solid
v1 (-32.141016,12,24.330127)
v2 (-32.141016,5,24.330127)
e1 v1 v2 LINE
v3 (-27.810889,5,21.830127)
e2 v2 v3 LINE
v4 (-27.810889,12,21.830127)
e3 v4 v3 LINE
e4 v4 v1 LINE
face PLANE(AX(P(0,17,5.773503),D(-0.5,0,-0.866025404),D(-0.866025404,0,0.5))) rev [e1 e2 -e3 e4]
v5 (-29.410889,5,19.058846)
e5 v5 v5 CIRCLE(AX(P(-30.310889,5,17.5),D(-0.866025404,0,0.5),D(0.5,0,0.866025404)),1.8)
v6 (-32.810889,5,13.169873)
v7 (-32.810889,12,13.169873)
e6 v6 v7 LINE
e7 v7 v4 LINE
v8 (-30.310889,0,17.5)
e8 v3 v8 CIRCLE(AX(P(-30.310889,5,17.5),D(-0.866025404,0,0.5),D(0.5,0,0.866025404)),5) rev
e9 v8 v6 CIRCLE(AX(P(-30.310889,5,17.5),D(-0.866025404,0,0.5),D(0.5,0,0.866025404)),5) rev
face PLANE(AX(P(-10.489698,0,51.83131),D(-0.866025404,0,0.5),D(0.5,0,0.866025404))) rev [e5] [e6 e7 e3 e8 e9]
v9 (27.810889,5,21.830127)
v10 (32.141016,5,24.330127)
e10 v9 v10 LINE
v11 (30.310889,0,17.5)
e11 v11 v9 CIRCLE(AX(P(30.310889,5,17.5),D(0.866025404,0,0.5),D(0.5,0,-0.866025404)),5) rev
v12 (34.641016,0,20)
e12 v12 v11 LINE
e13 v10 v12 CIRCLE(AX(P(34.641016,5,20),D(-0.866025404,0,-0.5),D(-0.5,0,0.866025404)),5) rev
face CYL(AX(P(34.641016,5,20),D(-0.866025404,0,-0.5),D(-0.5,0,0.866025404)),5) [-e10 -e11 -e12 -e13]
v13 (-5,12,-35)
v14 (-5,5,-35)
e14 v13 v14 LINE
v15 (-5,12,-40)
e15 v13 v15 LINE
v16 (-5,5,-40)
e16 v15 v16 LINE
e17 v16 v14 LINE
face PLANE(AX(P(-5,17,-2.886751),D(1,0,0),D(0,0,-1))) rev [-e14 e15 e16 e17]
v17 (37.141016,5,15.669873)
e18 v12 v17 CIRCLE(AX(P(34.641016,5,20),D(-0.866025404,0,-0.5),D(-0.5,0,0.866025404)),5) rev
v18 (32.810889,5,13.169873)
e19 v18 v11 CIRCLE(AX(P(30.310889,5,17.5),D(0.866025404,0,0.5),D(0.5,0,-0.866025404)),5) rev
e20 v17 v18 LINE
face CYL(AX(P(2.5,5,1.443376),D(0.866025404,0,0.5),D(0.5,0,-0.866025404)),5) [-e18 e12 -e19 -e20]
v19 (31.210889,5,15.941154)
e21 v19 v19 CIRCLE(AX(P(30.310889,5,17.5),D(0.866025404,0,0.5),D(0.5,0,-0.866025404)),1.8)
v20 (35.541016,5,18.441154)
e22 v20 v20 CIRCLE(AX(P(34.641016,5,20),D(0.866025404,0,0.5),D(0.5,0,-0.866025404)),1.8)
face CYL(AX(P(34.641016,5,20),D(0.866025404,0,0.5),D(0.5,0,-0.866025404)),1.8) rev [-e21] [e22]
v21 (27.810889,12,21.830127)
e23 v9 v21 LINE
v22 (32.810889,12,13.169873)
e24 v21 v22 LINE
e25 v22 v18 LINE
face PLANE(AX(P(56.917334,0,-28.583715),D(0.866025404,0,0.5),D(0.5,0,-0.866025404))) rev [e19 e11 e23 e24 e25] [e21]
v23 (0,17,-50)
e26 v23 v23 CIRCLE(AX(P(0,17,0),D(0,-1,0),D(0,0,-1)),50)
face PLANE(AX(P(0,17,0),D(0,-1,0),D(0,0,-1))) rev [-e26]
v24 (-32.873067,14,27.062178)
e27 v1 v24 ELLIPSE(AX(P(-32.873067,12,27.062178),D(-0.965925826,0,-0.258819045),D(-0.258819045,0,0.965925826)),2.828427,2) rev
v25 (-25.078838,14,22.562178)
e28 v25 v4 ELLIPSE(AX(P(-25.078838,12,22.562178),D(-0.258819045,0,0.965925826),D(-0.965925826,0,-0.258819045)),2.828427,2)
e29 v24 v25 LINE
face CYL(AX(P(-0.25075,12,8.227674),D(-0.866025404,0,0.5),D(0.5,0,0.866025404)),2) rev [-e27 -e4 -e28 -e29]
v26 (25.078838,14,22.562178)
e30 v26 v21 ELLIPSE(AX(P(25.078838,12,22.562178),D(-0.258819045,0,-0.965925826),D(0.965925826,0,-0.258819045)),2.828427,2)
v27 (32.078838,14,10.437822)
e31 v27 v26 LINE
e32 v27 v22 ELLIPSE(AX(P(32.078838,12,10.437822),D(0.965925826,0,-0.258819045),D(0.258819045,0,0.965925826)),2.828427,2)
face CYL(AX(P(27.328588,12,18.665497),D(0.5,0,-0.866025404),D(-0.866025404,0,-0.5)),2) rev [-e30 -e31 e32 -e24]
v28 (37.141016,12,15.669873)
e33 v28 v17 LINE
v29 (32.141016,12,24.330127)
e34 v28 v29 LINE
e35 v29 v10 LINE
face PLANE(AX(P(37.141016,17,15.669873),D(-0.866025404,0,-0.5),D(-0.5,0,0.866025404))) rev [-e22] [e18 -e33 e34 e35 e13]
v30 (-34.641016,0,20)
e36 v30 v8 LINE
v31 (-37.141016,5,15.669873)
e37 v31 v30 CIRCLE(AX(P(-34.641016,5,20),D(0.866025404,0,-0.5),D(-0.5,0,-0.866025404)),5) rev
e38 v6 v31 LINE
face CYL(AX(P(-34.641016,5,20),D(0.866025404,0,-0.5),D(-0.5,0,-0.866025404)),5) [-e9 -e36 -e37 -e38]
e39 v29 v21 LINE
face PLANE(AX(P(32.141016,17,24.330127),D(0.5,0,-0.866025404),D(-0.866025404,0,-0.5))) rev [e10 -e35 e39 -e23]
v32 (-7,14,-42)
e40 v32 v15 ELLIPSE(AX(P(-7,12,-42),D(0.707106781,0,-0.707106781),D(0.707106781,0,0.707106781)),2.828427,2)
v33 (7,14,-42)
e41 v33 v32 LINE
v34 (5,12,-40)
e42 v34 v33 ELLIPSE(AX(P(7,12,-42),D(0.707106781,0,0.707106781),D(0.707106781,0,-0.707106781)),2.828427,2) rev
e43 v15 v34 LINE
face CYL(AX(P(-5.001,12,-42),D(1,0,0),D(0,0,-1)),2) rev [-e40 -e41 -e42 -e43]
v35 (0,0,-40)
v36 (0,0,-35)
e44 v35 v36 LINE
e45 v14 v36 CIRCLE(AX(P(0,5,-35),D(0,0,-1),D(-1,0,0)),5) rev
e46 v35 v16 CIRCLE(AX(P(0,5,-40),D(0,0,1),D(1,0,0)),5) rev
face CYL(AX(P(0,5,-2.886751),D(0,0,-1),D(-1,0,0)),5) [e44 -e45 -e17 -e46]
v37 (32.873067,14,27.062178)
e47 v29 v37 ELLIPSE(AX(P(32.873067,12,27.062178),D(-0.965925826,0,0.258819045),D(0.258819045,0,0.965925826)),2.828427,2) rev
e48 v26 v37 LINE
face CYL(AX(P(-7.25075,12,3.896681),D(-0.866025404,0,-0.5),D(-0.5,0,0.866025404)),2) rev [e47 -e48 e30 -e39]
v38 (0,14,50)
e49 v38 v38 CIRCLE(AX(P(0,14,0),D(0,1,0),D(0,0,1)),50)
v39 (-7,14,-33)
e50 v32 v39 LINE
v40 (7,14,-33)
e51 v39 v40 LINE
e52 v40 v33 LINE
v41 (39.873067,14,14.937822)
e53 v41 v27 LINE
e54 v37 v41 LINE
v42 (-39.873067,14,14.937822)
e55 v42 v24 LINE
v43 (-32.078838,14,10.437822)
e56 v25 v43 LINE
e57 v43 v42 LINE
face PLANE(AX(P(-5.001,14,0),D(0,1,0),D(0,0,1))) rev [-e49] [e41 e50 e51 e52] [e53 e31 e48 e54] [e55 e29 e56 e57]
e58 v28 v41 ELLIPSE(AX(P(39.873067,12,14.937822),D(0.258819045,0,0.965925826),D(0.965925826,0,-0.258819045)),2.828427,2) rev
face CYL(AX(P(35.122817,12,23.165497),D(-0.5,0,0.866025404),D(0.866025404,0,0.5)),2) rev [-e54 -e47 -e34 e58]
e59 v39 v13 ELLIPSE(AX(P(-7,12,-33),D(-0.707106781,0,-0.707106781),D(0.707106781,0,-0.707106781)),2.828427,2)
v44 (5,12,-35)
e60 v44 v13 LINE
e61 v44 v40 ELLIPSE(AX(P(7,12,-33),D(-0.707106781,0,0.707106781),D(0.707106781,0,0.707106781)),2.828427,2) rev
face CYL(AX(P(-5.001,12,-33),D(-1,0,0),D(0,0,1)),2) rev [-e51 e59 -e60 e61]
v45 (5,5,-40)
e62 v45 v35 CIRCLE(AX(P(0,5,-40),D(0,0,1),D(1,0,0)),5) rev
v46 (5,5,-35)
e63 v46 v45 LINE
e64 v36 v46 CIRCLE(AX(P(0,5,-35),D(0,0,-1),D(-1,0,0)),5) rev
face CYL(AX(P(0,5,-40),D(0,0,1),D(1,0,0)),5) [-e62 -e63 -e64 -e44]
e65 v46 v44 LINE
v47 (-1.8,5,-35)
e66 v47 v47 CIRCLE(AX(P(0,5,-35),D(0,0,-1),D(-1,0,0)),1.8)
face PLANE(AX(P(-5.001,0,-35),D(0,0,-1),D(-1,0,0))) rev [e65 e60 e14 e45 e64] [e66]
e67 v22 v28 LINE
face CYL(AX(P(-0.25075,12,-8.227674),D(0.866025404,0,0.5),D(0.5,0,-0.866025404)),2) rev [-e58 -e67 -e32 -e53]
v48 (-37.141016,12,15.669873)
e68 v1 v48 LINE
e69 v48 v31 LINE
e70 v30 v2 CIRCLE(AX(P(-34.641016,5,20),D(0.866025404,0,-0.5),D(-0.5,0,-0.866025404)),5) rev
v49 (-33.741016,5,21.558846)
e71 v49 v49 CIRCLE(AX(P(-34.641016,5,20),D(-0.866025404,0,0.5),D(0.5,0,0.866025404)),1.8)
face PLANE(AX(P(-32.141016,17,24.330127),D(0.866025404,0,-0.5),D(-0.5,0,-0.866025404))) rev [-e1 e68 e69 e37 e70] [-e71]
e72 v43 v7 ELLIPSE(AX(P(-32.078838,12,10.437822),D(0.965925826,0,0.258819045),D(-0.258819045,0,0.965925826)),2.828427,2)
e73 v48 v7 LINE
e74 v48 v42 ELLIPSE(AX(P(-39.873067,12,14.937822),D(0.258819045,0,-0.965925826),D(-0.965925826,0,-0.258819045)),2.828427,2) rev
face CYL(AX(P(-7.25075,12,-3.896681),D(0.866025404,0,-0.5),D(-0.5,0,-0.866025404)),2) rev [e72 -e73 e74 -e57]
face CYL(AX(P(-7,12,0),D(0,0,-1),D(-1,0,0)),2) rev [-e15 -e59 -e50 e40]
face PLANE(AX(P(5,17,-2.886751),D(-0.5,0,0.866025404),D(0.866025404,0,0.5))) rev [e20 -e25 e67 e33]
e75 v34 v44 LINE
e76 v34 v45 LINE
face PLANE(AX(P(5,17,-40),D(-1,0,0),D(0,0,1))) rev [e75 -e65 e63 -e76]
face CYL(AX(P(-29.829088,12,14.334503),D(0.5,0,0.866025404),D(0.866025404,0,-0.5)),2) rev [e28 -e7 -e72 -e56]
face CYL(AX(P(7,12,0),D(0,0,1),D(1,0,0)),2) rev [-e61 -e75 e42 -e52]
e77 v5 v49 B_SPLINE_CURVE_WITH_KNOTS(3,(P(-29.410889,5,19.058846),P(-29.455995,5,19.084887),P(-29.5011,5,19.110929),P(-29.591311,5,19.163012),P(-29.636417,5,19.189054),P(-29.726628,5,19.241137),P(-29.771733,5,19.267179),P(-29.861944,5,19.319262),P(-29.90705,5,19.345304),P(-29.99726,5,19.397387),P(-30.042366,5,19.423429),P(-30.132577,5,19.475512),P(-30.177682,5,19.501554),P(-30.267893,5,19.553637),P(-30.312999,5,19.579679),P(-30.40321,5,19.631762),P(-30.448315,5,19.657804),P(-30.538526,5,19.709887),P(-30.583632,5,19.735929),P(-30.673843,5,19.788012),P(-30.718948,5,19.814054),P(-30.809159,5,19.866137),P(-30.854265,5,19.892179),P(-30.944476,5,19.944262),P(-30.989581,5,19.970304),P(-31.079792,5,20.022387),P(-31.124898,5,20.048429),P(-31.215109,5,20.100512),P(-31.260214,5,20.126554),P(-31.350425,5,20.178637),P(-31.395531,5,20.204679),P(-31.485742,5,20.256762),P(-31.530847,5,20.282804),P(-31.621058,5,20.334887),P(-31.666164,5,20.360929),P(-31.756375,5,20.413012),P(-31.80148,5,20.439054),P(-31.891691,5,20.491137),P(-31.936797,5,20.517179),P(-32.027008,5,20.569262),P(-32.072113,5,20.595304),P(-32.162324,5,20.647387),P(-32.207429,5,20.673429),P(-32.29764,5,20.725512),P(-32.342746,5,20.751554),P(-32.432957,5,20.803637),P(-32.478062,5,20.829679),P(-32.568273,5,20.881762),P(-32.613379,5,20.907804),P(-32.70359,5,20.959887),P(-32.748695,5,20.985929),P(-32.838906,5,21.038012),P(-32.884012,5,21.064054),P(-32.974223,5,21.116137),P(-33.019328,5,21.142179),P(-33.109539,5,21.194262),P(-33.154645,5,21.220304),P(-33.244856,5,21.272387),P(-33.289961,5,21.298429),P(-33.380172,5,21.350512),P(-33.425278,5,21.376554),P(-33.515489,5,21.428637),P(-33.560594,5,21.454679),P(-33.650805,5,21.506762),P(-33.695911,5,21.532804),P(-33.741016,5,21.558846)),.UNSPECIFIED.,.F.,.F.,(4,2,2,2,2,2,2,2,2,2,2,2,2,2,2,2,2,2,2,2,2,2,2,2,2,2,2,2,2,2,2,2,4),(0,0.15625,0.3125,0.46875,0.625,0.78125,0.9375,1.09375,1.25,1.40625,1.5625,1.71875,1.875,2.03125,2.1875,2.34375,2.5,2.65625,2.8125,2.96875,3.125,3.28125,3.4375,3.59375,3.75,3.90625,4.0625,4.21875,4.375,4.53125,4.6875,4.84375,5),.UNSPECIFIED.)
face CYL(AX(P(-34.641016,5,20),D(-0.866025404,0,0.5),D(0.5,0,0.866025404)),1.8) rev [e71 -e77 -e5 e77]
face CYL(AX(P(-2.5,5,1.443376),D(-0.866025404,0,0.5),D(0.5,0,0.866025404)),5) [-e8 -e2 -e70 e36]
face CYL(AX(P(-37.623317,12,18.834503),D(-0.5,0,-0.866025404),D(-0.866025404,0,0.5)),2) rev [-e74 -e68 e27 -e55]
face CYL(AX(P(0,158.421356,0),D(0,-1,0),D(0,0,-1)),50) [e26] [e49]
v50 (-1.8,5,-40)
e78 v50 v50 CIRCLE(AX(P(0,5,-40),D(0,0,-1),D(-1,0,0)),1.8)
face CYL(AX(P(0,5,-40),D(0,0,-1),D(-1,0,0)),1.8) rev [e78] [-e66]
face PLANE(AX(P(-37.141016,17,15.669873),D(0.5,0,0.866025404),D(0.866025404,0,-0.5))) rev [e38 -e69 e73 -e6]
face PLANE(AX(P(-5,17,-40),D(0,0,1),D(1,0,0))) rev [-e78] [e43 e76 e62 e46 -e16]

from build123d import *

# Parameters (mm, degrees)
BOSS_EXTRUDE1_DEPTH     = 17
CUT_EXTRUDE1_REACH      = 46.598
SKETCH3_W               = 35
SKETCH3_H               = 14
FILLET1_R               = 5
M3_CLEARANCE_HOLE1_D    = 3.6
CIRPATTERN1_START       = 14
CIRPATTERN1_DEPTH       = 3
CIRPATTERN1_START_2     = 6.8000001
CIRPATTERN1_2_DEPTH     = 7.1999999
CIRPATTERN1_3_DEPTH     = 6.8000001
CIRPATTERN1_START_3     = -40
CIRPATTERN1_4_OUTLINE_R = 1.8
CIRPATTERN1_4_DEPTH     = 5
CIRPATTERN1_START_4     = 35
CIRPATTERN1_5_OUTLINE_R = 1.8
CIRPATTERN1_5_DEPTH     = 5
SKETCH6_R               = 50
BOSS_EXTRUDE2_DEPTH     = 3
FILLET6_R               = 2


with BuildPart() as part:
    # Sketch2 → Boss-Extrude1 (new body)
    with BuildSketch(Plane(origin=(0, 0, 0), x_dir=(1, 0, 0), z_dir=(0, 1, 0))):
        Polygon((0, 0), (-5, 2.886751346), (-5, 40), (5, 40), (5, 2.886751346), align=None)
    extrude(amount=BOSS_EXTRUDE1_DEPTH)

    # Sketch3 → Cut-Extrude1 (cut, up to next)
    with BuildSketch(Plane(origin=(5, 0, 0), x_dir=(0, 0, -1), z_dir=(1, 0, 0)), mode=Mode.PRIVATE) as cut_extrude1_sk1:
        with Locations((17.5, 7)):
            Rectangle(SKETCH3_W, SKETCH3_H)
    cut_extrude1_tool1 = extrude(cut_extrude1_sk1.sketch, amount=-CUT_EXTRUDE1_REACH, mode=Mode.PRIVATE) & part.part
    add(cut_extrude1_tool1.solids().sort_by_distance((5, 7, -17.5))[0], mode=Mode.SUBTRACT)

    # Fillet1
    fillet1_edges = [part.edges().sort_by_distance(p)[0] for p in [
        (-5, 0, -37.5),
        (5, 0, -37.5),
    ]]
    fillet(fillet1_edges, radius=FILLET1_R - 0.0001)  # a hair under: the kernel refuses the full size

    # M3 Clearance Hole1 (through all)
    with Locations(Plane(origin=(0, 0, -40), x_dir=(-1, 0, 0), z_dir=(0, 0, -1))):
        with Locations((0, 5)):
            Hole(M3_CLEARANCE_HOLE1_D / 2)

    # CirPattern1: read off the stored shape, not the designer's step
    # CirPattern1 outline → CirPattern1 (add)
    with BuildSketch(Plane(origin=(0, 0, 0), x_dir=(1, 0, 0), z_dir=(0, 1, 0)).offset(CIRPATTERN1_START)):
        Polygon((-37.141016151, -15.669872981), (-32.141016151, -24.330127019), (0, -5.773502692), (32.141016151, -24.330127019), (37.141016151, -15.669872981), (5, 2.886751346), (0, 0), (-5, 2.886751346), align=None)
    extrude(amount=CIRPATTERN1_DEPTH)

    # CirPattern1 2 outline → CirPattern1 2 (add)
    with BuildSketch(Plane(origin=(0, 0, 0), x_dir=(1, 0, 0), z_dir=(0, 1, 0)).offset(CIRPATTERN1_START_2)):
        Polygon((-32.810889132, -13.169872981), (-37.141016151, -15.669872981), (-32.141016151, -24.330127019), (-27.810889132, -21.830127019), align=None)
        Polygon((32.810889132, -13.169872981), (27.810889132, -21.830127019), (32.141016151, -24.330127019), (37.141016151, -15.669872981), align=None)
    extrude(amount=CIRPATTERN1_2_DEPTH)

    # CirPattern1 3 outline → CirPattern1 3 (add)
    with BuildSketch(Plane(origin=(0, 0, 0), x_dir=(1, 0, 0), z_dir=(0, 1, 0))):
        Polygon((32.810889132, -13.169872981), (27.810889132, -21.830127019), (32.141016151, -24.330127019), (37.141016151, -15.669872981), align=None)
        Polygon((-32.810889132, -13.169872981), (-37.141016151, -15.669872981), (-32.141016151, -24.330127019), (-27.810889132, -21.830127019), align=None)
    extrude(amount=CIRPATTERN1_3_DEPTH)

    # CirPattern1 4 outline → CirPattern1 4 (cut)
    with BuildSketch(Plane(origin=(0, 0, 0), x_dir=(0.500000000000006, 0, 0.8660254037844353), z_dir=(0.8660254037844352, 0, -0.5000000000000061)).offset(CIRPATTERN1_START_3)):
        with BuildLine():
            Line((5, 0), (0, 0))
            ThreePointArc((0, 0), (3.535533906, -1.464466094), (5, -5))
            Line((5, -5), (5, 0))
        make_face()
        with BuildLine():
            ThreePointArc((-5, -5), (-3.535533906, -1.464466094), (0, 0))
            Line((0, 0), (-5, 0))
            Line((-5, 0), (-5, -5))
        make_face()
        with Locations((0, -5)):
            Circle(CIRPATTERN1_4_OUTLINE_R)
    extrude(amount=CIRPATTERN1_4_DEPTH, mode=Mode.SUBTRACT)

    # CirPattern1 5 outline → CirPattern1 5 (cut)
    with BuildSketch(Plane(origin=(0, 0, 0), x_dir=(0.4999999999999894, 0, -0.8660254037844448), z_dir=(0.8660254037844447, 0, 0.4999999999999898)).offset(CIRPATTERN1_START_4)):
        with BuildLine():
            Line((-5, 0), (0, 0))
            ThreePointArc((0, 0), (-3.535533906, 1.464466094), (-5, 5))
            Line((-5, 5), (-5, 0))
        make_face()
        with BuildLine():
            ThreePointArc((5, 5), (3.535533906, 1.464466094), (0, 0))
            Line((0, 0), (5, 0))
            Line((5, 0), (5, 5))
        make_face()
        with Locations((0, 5)):
            Circle(CIRPATTERN1_5_OUTLINE_R)
    extrude(amount=CIRPATTERN1_5_DEPTH, mode=Mode.SUBTRACT)

    # Sketch6 → Boss-Extrude2 (add)
    with BuildSketch(Plane(origin=(0, 14, 0), x_dir=(1, 0, 0), z_dir=(0, 1, 0))):
        with Locations(Location((0, 0, 0), (0, 0, 90))):
            Circle(SKETCH6_R)
    extrude(amount=BOSS_EXTRUDE2_DEPTH)

    # Fillet6
    fillet6_edges = [part.edges().sort_by_distance(p)[0] for p in [
        (5, 14, -37.5),
        (0, 14, -40),
        (-5, 14, -37.5),
        (-34.975952642, 14, 14.419872981),
        (-34.641016151, 14, 20),
        (-29.975952642, 14, 23.080127019),
        (29.975952642, 14, 23.080127019),
        (34.641016151, 14, 20),
        (34.975952642, 14, 14.419872981),
        (0, 14, -35),
        (-30.310889132, 14, 17.5),
        (30.310889132, 14, 17.5),
    ]]
    fillet(fillet6_edges, radius=FILLET6_R)


solid = part.part
